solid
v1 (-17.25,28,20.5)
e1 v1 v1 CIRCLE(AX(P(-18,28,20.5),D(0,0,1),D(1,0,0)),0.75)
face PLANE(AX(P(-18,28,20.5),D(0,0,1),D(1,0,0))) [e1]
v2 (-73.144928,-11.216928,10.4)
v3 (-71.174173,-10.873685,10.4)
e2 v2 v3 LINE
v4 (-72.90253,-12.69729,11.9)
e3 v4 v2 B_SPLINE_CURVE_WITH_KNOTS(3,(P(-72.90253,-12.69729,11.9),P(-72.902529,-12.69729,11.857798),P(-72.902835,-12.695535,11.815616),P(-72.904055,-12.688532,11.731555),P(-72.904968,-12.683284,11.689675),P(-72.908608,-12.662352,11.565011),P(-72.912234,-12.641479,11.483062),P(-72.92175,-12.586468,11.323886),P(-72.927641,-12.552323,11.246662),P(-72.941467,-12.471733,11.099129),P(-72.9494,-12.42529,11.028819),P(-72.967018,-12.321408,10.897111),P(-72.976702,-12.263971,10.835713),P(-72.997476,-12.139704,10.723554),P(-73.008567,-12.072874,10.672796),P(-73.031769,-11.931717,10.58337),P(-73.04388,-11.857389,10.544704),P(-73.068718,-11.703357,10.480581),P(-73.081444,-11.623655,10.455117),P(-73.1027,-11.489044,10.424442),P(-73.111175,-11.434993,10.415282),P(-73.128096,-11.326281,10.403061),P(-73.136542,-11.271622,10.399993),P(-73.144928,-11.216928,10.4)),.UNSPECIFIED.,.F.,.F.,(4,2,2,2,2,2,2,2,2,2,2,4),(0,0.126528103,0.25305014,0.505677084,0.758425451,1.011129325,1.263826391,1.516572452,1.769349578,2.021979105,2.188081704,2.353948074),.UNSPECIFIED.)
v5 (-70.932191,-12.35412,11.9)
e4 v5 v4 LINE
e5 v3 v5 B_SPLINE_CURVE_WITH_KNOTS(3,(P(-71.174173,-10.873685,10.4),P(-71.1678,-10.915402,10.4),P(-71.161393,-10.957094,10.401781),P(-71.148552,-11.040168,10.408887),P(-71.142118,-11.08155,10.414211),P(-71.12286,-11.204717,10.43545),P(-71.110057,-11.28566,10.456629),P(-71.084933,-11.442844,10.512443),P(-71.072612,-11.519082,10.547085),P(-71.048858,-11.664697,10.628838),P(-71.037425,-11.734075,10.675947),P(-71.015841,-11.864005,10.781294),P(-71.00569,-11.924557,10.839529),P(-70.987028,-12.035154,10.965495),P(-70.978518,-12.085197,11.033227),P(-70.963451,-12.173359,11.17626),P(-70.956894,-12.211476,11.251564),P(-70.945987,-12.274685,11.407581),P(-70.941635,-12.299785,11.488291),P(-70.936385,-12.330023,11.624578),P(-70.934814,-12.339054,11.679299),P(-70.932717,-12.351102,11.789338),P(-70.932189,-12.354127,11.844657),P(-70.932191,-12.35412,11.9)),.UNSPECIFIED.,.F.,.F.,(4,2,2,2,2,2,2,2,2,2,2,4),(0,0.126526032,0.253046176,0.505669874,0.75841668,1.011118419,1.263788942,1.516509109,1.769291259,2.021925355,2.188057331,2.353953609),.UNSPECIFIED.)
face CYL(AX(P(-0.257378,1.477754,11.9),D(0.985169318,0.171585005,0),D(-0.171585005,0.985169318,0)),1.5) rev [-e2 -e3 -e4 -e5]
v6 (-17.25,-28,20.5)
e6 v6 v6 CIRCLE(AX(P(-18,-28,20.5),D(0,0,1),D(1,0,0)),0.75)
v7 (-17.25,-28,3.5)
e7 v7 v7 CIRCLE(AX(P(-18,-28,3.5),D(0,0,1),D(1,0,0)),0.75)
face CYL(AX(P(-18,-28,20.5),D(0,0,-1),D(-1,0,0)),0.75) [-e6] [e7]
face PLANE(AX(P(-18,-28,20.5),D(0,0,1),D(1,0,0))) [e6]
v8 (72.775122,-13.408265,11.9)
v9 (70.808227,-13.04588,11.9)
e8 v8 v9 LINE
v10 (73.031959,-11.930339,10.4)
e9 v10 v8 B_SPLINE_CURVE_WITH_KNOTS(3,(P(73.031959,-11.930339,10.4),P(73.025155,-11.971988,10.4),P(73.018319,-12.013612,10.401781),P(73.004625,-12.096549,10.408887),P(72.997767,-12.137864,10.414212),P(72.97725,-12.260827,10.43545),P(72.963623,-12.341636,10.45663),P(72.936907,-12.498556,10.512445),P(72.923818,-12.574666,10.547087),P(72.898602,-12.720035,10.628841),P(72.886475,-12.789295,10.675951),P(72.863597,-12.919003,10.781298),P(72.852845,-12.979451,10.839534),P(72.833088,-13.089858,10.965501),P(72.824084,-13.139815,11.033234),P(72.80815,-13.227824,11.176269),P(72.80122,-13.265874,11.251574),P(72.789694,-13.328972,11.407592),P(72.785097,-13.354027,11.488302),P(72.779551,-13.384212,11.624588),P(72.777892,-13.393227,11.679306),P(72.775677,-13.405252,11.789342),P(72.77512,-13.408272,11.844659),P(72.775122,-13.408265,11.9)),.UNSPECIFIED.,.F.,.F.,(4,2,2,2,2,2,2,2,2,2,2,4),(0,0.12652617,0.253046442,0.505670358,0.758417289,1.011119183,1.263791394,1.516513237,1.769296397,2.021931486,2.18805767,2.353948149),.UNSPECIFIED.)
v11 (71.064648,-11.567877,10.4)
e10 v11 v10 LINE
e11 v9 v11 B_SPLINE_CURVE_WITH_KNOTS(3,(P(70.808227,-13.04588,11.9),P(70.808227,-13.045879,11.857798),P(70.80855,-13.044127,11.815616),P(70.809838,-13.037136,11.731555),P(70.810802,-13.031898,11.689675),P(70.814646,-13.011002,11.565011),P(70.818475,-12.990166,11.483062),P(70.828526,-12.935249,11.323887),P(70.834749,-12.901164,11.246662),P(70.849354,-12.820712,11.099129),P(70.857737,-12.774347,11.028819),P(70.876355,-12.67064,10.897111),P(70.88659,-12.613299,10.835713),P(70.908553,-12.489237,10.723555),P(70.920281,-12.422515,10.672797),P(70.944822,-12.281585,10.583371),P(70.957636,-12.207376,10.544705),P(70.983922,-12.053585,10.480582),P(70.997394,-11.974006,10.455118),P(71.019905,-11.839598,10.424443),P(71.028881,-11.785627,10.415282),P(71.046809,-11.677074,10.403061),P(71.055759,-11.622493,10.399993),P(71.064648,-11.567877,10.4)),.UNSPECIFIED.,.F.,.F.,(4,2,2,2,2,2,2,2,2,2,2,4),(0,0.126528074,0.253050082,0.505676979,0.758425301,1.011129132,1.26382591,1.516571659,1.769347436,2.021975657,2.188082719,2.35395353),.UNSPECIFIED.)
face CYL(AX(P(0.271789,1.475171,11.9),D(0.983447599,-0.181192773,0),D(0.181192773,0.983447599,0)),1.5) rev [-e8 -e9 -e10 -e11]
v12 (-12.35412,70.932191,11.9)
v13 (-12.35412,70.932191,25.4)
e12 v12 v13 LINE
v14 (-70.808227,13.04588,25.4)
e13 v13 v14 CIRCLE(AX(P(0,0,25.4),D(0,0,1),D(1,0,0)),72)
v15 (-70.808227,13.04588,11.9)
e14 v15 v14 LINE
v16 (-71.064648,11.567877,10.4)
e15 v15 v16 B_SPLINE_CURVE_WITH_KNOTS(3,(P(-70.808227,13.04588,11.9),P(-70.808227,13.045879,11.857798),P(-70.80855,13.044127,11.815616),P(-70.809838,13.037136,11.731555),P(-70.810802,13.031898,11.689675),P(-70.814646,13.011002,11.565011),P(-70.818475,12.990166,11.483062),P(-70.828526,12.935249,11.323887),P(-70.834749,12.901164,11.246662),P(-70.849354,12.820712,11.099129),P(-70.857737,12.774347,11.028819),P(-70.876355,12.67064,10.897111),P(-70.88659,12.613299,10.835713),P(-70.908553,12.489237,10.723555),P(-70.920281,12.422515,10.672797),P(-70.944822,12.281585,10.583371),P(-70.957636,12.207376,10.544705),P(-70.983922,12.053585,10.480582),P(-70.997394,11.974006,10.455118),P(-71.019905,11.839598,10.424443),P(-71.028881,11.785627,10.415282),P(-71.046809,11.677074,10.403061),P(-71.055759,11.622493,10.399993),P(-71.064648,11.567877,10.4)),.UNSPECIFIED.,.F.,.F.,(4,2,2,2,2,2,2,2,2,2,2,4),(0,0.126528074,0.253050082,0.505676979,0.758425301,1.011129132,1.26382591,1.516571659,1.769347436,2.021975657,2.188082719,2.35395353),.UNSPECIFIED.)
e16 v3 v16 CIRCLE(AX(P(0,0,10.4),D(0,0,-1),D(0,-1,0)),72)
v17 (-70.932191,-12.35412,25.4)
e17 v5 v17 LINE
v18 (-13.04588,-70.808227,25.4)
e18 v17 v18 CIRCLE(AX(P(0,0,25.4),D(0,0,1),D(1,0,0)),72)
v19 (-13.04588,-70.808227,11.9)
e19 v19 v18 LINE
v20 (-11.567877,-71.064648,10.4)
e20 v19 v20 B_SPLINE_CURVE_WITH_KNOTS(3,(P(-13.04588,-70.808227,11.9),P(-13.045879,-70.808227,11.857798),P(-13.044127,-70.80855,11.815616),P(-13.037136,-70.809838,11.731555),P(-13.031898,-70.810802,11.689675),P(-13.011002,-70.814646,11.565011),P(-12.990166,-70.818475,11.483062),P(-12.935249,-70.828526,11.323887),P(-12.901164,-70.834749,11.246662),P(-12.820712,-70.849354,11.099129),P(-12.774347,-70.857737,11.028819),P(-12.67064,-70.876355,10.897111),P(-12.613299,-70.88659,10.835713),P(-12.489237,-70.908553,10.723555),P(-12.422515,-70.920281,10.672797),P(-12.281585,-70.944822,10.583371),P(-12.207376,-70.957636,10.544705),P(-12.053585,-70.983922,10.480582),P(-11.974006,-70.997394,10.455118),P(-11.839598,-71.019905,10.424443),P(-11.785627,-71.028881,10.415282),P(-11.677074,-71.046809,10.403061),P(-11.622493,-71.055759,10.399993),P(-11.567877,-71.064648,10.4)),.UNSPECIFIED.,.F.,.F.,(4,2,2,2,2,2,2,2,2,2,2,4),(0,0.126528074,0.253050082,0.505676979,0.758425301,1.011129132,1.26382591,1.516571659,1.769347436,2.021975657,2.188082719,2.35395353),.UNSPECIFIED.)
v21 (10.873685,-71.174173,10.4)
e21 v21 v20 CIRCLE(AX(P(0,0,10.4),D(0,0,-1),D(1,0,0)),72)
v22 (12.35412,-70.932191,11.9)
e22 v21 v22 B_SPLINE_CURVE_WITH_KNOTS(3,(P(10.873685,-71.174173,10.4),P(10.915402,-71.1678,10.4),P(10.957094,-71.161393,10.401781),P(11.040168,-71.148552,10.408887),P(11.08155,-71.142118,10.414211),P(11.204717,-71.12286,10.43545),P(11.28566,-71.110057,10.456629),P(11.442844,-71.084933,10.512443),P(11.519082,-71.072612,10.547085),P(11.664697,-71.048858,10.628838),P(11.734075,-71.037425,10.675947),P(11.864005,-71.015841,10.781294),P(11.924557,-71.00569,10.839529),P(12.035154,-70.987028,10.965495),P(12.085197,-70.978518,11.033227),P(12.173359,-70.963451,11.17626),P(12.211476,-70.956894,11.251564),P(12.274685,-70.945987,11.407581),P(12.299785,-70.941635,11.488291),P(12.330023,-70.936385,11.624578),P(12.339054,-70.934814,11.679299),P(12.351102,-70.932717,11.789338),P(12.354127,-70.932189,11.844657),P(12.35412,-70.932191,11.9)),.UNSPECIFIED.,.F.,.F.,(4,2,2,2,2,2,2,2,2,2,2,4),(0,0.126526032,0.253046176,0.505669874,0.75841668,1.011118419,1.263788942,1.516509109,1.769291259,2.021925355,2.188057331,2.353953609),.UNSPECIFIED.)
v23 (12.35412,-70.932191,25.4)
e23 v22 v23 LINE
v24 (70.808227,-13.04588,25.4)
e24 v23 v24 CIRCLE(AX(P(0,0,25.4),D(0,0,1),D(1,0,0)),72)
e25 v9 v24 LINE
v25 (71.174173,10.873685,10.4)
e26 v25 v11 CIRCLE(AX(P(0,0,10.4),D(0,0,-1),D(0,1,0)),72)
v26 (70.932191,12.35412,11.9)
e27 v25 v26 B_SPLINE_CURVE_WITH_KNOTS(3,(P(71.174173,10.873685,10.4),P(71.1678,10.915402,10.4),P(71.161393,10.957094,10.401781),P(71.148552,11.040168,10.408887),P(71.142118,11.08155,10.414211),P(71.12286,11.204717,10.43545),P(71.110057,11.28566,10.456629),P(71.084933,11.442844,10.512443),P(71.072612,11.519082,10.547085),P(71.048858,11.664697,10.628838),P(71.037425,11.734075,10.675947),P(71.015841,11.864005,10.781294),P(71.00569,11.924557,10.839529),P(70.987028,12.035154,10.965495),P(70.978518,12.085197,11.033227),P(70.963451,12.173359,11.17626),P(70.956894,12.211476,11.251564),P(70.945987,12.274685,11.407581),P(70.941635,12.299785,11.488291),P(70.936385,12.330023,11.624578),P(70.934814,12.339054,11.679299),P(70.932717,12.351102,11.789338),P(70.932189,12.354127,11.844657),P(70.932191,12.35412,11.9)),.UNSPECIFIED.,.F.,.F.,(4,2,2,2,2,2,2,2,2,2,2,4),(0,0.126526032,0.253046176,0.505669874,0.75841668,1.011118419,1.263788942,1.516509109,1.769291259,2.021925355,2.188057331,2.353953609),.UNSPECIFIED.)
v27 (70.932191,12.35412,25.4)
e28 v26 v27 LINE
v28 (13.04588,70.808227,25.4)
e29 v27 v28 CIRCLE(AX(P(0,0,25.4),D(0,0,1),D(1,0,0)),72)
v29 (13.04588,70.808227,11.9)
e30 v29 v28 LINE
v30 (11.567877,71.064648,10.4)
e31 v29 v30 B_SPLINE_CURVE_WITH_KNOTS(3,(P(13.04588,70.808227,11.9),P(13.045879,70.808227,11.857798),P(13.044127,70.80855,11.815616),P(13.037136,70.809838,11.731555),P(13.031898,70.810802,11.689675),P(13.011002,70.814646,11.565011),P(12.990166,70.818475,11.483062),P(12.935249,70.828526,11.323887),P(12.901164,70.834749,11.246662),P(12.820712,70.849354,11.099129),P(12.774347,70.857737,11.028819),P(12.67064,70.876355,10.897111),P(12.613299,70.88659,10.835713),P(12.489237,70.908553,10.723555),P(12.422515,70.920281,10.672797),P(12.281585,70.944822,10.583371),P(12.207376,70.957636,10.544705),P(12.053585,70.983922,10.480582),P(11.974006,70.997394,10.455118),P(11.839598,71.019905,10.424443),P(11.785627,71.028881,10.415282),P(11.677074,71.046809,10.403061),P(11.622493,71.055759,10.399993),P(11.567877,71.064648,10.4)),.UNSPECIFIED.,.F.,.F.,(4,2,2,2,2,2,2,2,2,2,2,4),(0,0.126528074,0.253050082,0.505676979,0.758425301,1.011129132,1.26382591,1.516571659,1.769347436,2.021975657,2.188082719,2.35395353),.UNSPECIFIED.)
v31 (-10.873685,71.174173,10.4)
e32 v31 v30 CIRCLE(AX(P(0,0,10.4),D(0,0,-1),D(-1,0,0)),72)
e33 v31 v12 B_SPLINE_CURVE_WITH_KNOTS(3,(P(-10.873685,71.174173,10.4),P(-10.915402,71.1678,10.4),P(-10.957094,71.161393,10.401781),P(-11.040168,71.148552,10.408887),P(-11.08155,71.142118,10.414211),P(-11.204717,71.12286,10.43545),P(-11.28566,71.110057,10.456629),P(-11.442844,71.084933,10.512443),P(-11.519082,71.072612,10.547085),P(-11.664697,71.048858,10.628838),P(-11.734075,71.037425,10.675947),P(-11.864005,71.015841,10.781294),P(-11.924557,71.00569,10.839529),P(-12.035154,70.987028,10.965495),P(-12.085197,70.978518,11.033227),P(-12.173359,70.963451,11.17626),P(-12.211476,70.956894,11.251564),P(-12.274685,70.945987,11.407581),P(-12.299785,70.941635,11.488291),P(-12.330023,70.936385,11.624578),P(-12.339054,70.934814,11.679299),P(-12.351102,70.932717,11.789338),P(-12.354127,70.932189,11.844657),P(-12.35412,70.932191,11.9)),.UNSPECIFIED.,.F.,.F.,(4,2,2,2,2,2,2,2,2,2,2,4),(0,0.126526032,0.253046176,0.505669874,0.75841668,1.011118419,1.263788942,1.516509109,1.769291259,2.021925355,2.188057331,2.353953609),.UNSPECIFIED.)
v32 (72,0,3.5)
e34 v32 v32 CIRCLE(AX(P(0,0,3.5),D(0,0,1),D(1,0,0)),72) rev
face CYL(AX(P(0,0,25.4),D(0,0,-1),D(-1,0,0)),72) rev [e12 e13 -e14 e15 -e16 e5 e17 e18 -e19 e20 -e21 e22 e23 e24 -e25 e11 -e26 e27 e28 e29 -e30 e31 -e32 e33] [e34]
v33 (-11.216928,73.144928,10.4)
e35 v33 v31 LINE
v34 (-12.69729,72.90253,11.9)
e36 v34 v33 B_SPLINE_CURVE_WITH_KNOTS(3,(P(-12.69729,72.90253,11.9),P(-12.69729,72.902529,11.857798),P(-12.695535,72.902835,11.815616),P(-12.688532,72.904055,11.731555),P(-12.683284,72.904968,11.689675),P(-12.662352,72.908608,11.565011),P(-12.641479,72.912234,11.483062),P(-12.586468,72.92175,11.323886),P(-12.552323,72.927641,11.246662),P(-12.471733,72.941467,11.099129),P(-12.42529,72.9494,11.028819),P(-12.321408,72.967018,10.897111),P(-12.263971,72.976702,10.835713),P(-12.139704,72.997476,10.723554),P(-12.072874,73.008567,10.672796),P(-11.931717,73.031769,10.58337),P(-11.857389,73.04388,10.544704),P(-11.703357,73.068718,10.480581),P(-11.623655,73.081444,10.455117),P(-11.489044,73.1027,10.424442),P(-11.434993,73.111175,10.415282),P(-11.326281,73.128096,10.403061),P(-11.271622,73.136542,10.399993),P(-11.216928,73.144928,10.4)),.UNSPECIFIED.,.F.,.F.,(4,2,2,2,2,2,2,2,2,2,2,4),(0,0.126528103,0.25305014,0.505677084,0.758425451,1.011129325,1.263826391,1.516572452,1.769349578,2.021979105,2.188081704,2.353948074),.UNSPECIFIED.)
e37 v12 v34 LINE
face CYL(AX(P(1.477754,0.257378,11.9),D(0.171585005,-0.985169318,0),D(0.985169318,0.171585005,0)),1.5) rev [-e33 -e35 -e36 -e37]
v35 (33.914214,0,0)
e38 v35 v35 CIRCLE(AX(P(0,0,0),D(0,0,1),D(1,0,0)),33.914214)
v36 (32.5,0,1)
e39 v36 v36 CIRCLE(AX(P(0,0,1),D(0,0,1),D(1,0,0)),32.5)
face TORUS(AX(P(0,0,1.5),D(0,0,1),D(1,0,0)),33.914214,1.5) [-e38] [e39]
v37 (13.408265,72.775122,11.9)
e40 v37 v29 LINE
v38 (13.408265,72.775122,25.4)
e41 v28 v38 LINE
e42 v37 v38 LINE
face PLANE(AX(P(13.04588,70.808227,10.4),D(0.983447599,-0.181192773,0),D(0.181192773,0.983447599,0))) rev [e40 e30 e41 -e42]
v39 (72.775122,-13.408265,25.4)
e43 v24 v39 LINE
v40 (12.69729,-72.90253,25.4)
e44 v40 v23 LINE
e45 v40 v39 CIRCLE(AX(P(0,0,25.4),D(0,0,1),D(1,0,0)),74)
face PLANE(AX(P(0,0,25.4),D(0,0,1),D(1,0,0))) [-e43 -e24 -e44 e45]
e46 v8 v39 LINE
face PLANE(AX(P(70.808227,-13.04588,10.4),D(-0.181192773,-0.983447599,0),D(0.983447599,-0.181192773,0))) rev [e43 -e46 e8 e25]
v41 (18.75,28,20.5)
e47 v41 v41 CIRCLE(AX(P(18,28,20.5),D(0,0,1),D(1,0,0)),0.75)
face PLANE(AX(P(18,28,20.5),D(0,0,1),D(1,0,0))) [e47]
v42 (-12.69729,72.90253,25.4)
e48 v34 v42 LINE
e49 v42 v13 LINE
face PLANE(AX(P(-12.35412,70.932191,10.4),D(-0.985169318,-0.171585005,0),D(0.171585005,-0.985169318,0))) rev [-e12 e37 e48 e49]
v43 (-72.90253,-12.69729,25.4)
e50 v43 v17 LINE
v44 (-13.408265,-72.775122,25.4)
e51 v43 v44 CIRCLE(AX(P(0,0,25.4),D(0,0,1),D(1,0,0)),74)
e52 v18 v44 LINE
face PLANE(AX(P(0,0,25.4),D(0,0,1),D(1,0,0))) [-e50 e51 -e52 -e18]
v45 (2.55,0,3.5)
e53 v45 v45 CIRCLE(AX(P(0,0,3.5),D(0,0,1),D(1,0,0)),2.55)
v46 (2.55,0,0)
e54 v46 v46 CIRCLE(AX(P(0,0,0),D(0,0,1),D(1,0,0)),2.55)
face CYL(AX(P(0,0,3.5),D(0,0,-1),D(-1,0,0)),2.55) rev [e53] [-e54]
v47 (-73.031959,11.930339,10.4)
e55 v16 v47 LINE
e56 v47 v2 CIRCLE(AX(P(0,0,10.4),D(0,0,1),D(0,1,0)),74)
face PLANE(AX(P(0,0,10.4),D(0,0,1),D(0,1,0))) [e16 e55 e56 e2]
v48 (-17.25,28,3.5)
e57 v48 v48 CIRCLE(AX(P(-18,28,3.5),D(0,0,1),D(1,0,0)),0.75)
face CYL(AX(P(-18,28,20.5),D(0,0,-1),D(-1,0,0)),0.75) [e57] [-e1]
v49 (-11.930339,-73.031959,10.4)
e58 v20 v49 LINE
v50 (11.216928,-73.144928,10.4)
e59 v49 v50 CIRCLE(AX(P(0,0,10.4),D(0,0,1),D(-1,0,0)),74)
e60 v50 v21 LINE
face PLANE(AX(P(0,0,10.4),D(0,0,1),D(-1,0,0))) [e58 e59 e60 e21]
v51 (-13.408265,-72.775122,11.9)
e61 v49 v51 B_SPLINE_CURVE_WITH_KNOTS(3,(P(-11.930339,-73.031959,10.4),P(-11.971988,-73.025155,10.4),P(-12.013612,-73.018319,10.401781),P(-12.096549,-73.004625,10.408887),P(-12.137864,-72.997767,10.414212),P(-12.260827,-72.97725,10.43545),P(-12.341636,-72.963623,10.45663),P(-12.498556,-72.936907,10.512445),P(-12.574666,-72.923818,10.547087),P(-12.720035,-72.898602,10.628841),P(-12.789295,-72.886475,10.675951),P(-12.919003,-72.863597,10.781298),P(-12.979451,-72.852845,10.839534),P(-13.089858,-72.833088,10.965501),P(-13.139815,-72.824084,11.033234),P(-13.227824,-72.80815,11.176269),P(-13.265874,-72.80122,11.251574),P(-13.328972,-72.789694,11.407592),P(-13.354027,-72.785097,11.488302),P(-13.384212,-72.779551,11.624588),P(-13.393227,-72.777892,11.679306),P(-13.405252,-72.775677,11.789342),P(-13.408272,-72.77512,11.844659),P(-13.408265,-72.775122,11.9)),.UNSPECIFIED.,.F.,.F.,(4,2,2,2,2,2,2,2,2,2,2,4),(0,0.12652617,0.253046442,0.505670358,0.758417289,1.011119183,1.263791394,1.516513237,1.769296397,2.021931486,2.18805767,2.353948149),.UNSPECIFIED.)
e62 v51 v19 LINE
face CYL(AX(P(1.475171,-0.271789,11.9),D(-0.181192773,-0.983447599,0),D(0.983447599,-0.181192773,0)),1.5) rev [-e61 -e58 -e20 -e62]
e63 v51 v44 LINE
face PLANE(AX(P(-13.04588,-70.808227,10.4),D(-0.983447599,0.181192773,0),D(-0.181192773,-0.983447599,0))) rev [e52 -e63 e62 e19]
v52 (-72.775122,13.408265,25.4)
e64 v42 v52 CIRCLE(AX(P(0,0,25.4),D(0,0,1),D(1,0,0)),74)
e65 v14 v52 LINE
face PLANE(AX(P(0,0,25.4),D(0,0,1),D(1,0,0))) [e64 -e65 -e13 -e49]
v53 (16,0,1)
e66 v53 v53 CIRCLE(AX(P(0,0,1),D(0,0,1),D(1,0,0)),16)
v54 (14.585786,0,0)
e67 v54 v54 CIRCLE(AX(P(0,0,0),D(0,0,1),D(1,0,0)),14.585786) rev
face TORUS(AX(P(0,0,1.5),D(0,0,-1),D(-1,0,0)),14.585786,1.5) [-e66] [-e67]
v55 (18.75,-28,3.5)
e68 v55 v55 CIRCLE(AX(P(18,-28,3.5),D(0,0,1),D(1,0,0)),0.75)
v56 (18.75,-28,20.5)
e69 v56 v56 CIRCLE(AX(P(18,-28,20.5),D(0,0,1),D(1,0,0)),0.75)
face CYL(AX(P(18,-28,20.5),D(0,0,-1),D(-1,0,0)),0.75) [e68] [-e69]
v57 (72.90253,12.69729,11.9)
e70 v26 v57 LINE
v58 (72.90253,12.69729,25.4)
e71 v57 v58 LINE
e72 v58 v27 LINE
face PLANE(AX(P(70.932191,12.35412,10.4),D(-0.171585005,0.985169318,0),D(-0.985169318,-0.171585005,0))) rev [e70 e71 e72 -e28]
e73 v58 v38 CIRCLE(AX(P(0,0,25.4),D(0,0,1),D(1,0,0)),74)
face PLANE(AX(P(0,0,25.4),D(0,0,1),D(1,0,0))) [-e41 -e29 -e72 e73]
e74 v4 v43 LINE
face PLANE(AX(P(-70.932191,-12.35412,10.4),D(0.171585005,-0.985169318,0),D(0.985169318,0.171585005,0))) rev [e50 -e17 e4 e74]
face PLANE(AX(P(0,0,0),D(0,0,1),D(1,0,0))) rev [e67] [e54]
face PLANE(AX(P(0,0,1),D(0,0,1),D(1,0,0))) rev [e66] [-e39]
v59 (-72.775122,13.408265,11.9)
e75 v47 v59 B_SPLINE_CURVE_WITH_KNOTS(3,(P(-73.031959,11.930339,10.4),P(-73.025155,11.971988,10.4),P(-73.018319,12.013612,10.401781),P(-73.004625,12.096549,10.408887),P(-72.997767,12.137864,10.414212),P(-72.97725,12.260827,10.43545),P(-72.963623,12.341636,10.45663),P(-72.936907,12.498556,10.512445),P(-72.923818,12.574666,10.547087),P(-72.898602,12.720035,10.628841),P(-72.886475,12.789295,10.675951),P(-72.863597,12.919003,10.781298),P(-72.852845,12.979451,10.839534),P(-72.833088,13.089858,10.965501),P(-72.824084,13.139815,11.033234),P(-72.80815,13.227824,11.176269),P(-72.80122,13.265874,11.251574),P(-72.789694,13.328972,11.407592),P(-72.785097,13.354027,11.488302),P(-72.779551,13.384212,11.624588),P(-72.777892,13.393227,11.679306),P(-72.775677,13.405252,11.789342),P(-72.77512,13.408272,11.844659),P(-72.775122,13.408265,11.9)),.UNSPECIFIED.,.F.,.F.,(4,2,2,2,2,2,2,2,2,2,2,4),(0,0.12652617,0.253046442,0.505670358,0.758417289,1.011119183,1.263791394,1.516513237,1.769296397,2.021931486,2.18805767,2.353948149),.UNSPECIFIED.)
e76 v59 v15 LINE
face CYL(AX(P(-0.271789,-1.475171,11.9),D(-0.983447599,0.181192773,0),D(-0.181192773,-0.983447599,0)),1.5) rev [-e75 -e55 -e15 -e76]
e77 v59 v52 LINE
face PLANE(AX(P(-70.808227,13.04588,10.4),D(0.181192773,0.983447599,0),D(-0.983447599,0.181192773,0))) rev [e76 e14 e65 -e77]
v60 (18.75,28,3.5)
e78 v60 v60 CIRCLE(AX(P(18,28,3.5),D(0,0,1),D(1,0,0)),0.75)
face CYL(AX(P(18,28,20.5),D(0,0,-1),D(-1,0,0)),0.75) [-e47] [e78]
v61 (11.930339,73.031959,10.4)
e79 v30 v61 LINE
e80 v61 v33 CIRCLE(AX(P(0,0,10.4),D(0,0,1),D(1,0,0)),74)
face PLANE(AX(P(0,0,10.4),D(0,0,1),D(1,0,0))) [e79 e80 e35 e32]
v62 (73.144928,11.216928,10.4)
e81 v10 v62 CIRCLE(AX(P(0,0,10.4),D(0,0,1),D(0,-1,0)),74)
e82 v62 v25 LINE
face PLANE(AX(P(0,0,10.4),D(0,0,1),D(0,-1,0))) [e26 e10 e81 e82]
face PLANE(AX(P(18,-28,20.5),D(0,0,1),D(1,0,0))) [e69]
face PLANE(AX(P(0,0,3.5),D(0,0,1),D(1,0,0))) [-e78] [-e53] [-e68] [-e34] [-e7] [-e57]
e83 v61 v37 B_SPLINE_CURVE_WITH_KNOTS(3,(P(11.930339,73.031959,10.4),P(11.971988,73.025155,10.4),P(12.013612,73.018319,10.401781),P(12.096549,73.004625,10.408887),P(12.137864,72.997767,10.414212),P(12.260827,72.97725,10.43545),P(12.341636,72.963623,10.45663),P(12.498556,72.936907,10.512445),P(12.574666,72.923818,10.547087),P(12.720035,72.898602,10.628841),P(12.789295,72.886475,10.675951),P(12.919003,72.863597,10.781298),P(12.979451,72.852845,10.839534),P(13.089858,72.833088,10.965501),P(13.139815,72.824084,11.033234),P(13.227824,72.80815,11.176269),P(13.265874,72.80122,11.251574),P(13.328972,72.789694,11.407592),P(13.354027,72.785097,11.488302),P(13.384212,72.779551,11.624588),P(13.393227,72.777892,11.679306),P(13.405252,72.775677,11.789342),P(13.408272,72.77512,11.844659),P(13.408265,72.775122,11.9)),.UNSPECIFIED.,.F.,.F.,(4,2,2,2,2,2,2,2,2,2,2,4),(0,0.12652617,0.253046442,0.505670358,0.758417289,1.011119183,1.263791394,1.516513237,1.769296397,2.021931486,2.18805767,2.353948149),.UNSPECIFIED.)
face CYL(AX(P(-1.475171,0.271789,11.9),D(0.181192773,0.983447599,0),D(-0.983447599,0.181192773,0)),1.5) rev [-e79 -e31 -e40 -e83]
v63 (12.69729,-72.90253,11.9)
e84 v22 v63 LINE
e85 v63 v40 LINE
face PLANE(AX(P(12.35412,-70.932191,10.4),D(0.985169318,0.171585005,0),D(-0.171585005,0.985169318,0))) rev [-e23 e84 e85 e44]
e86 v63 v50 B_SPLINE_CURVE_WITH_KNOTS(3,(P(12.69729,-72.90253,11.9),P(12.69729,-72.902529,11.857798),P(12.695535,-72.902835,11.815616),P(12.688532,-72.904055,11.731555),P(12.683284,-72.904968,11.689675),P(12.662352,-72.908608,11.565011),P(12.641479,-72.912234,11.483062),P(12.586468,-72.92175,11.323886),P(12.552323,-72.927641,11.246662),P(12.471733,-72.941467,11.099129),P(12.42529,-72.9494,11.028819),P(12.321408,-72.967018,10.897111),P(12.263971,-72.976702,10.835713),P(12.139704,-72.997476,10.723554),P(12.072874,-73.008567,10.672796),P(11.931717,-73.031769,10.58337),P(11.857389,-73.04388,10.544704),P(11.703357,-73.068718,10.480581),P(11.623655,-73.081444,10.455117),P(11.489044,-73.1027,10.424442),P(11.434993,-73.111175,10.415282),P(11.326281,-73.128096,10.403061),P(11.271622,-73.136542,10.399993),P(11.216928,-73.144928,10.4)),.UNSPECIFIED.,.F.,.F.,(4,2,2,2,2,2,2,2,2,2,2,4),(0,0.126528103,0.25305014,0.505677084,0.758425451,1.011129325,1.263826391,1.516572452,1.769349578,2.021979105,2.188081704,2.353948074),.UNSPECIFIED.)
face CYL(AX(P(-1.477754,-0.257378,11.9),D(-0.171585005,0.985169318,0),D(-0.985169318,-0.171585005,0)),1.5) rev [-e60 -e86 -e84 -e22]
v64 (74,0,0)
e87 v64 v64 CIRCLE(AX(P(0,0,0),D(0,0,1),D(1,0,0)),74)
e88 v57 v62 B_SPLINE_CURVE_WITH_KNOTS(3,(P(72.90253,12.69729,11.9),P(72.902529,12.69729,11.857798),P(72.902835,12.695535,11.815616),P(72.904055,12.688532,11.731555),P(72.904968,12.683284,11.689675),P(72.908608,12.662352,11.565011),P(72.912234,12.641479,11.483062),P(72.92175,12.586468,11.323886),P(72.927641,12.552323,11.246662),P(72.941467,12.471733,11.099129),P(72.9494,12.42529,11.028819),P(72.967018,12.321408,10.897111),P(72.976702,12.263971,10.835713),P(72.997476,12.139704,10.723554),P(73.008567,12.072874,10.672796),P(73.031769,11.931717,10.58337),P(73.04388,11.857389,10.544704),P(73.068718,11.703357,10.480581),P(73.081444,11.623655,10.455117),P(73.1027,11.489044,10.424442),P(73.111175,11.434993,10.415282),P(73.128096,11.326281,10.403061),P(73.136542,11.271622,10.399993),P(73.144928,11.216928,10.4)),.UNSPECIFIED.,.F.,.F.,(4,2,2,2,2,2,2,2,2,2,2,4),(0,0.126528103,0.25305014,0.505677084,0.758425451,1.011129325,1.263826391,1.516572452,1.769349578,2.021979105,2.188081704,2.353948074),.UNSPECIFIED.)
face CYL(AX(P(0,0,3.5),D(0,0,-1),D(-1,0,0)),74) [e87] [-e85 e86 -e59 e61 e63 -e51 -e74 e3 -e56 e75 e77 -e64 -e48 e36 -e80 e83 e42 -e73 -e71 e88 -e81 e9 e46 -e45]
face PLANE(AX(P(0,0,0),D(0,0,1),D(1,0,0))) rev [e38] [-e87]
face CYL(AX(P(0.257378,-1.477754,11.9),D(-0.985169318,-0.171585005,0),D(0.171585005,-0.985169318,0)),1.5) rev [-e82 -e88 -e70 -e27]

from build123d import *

# Parameters (mm, degrees)
SKETCH1_R           = 74
SKETCH1_R_2         = 2.55
BOSS_EXTRUDE1_DEPTH = 3.5
SKETCH2_R           = 32.5
SKETCH2_R_2         = 16
CUT_EXTRUDE4_DEPTH  = 1
FILLET1_R           = 1.5
FILLET2_R           = 1.5
SKETCH3_R           = 74
SKETCH3_R_2         = 72
BOSS_EXTRUDE2_DEPTH = 25.4
CUT_EXTRUDE5_START  = -15
CUT_EXTRUDE5_DEPTH  = 15
CIRPATTERN2_COUNT   = 4
FILLET4_R           = 1.5
SKETCH6_R           = 0.75
BOSS_EXTRUDE3_DEPTH = 17


with BuildPart() as part:
    # Sketch1 → Boss-Extrude1 (new body)
    with BuildSketch(Plane.XY):
        Circle(SKETCH1_R)
        Circle(SKETCH1_R_2, mode=Mode.SUBTRACT)
    extrude(amount=BOSS_EXTRUDE1_DEPTH)

    # Sketch2 → Cut-Extrude4 (cut)
    with BuildSketch(Plane.XY):
        Circle(SKETCH2_R)
        Circle(SKETCH2_R_2, mode=Mode.SUBTRACT)
    extrude(amount=CUT_EXTRUDE4_DEPTH, mode=Mode.SUBTRACT)

    # Fillet1
    # the kernel refuses this fillet: 1.5 mm, written as the material it takes off along each edge
    with BuildSketch(Plane(origin=(0, 0, 0), x_dir=(1, 0, 0), z_dir=(0, -1, 0))) as fillet1_piece_1:
        with BuildLine():
            CenterArc((33.914213562, 1.5), FILLET1_R, 199.471220634, 70.528779366)
            Line((32.5, 1), (32.471715729, 0.99))
            ThreePointArc((32.471715729, 0.99), (32.47, 0.5), (32.47, 0))
            Line((32.47, 0), (32.5, -0.03))
            Line((32.5, -0.03), (33.914213562, -0.03))
            Line((33.914213562, -0.03), (33.914213562, 0))
        make_face()
    revolve(axis=Axis((0, 0, 0), (0, 0, 1)), mode=Mode.SUBTRACT)

    # Fillet2
    # the kernel refuses this fillet: 1.5 mm, written as the material it takes off along each edge
    with BuildSketch(Plane(origin=(0, 0, 0), x_dir=(1, 0, 0), z_dir=(0, -1, 0))) as fillet2_piece_1:
        with BuildLine():
            CenterArc((14.585786438, 1.5), FILLET2_R, 270, 70.528779366)
            Line((16, 1), (16.028284271, 0.99))
            ThreePointArc((16.028284271, 0.99), (16.03, 0.5), (16.03, 0))
            Line((16.03, 0), (16, -0.03))
            Line((16, -0.03), (14.585786438, -0.03))
            Line((14.585786438, -0.03), (14.585786438, 0))
        make_face()
    revolve(axis=Axis((0, 0, 0), (0, 0, 1)), mode=Mode.SUBTRACT)

    # Sketch3 → Boss-Extrude2 (add)
    with BuildSketch(Plane.XY):
        Circle(SKETCH3_R)
        Circle(SKETCH3_R_2, mode=Mode.SUBTRACT)
    extrude(amount=BOSS_EXTRUDE2_DEPTH)

    # Sketch5 → Cut-Extrude5 (cut)
    with BuildSketch(Plane.XY.offset(25.4).offset(CUT_EXTRUDE5_START)):
        with BuildLine():
            Line((-12.354120349, 70.932190932), (-12.697290359, 72.902529569))
            ThreePointArc((-12.697290359, 72.902529569), (0.361150189, 73.999118715), (13.408265197, 72.775122291))
            Line((13.408265197, 72.775122291), (13.045879651, 70.808227094))
            ThreePointArc((13.045879651, 70.808227094), (0.351389373, 71.999142533), (-12.354120349, 70.932190932))
        make_face()
    cut_extrude5 = extrude(amount=CUT_EXTRUDE5_DEPTH, mode=Mode.SUBTRACT)

    # CirPattern2: Cut-Extrude5 ×4 about axis
    cirpattern2_axis = Axis((0, 0, 0), (0, 0, -1))
    for i in range(1, CIRPATTERN2_COUNT):
        add(cut_extrude5.rotate(cirpattern2_axis, i * 360 / CIRPATTERN2_COUNT), mode=Mode.SUBTRACT)

    # Fillet4
    fillet4_edges = [part.edges().sort_by_distance(p)[0] for p in [
        (13.227072424, 71.791674692, 10.4),
        (-12.525705354, 71.91736025, 10.4),
        (-71.791674692, 13.227072424, 10.4),
        (-71.91736025, -12.525705354, 10.4),
        (-13.227072424, -71.791674692, 10.4),
        (12.525705354, -71.91736025, 10.4),
        (71.791674692, -13.227072424, 10.4),
        (71.91736025, 12.525705354, 10.4),
    ]]
    fillet(fillet4_edges, radius=FILLET4_R)

    # Sketch6 → Boss-Extrude3 (add)
    with BuildSketch(Plane.XY.offset(3.5)):
        with Locations((18, 28)):
            Circle(SKETCH6_R)
        with Locations((-18, 28)):
            Circle(SKETCH6_R)
        with Locations((-18, -28)):
            Circle(SKETCH6_R)
        with Locations((18, -28)):
            Circle(SKETCH6_R)
    extrude(amount=BOSS_EXTRUDE3_DEPTH)


solid = part.part
